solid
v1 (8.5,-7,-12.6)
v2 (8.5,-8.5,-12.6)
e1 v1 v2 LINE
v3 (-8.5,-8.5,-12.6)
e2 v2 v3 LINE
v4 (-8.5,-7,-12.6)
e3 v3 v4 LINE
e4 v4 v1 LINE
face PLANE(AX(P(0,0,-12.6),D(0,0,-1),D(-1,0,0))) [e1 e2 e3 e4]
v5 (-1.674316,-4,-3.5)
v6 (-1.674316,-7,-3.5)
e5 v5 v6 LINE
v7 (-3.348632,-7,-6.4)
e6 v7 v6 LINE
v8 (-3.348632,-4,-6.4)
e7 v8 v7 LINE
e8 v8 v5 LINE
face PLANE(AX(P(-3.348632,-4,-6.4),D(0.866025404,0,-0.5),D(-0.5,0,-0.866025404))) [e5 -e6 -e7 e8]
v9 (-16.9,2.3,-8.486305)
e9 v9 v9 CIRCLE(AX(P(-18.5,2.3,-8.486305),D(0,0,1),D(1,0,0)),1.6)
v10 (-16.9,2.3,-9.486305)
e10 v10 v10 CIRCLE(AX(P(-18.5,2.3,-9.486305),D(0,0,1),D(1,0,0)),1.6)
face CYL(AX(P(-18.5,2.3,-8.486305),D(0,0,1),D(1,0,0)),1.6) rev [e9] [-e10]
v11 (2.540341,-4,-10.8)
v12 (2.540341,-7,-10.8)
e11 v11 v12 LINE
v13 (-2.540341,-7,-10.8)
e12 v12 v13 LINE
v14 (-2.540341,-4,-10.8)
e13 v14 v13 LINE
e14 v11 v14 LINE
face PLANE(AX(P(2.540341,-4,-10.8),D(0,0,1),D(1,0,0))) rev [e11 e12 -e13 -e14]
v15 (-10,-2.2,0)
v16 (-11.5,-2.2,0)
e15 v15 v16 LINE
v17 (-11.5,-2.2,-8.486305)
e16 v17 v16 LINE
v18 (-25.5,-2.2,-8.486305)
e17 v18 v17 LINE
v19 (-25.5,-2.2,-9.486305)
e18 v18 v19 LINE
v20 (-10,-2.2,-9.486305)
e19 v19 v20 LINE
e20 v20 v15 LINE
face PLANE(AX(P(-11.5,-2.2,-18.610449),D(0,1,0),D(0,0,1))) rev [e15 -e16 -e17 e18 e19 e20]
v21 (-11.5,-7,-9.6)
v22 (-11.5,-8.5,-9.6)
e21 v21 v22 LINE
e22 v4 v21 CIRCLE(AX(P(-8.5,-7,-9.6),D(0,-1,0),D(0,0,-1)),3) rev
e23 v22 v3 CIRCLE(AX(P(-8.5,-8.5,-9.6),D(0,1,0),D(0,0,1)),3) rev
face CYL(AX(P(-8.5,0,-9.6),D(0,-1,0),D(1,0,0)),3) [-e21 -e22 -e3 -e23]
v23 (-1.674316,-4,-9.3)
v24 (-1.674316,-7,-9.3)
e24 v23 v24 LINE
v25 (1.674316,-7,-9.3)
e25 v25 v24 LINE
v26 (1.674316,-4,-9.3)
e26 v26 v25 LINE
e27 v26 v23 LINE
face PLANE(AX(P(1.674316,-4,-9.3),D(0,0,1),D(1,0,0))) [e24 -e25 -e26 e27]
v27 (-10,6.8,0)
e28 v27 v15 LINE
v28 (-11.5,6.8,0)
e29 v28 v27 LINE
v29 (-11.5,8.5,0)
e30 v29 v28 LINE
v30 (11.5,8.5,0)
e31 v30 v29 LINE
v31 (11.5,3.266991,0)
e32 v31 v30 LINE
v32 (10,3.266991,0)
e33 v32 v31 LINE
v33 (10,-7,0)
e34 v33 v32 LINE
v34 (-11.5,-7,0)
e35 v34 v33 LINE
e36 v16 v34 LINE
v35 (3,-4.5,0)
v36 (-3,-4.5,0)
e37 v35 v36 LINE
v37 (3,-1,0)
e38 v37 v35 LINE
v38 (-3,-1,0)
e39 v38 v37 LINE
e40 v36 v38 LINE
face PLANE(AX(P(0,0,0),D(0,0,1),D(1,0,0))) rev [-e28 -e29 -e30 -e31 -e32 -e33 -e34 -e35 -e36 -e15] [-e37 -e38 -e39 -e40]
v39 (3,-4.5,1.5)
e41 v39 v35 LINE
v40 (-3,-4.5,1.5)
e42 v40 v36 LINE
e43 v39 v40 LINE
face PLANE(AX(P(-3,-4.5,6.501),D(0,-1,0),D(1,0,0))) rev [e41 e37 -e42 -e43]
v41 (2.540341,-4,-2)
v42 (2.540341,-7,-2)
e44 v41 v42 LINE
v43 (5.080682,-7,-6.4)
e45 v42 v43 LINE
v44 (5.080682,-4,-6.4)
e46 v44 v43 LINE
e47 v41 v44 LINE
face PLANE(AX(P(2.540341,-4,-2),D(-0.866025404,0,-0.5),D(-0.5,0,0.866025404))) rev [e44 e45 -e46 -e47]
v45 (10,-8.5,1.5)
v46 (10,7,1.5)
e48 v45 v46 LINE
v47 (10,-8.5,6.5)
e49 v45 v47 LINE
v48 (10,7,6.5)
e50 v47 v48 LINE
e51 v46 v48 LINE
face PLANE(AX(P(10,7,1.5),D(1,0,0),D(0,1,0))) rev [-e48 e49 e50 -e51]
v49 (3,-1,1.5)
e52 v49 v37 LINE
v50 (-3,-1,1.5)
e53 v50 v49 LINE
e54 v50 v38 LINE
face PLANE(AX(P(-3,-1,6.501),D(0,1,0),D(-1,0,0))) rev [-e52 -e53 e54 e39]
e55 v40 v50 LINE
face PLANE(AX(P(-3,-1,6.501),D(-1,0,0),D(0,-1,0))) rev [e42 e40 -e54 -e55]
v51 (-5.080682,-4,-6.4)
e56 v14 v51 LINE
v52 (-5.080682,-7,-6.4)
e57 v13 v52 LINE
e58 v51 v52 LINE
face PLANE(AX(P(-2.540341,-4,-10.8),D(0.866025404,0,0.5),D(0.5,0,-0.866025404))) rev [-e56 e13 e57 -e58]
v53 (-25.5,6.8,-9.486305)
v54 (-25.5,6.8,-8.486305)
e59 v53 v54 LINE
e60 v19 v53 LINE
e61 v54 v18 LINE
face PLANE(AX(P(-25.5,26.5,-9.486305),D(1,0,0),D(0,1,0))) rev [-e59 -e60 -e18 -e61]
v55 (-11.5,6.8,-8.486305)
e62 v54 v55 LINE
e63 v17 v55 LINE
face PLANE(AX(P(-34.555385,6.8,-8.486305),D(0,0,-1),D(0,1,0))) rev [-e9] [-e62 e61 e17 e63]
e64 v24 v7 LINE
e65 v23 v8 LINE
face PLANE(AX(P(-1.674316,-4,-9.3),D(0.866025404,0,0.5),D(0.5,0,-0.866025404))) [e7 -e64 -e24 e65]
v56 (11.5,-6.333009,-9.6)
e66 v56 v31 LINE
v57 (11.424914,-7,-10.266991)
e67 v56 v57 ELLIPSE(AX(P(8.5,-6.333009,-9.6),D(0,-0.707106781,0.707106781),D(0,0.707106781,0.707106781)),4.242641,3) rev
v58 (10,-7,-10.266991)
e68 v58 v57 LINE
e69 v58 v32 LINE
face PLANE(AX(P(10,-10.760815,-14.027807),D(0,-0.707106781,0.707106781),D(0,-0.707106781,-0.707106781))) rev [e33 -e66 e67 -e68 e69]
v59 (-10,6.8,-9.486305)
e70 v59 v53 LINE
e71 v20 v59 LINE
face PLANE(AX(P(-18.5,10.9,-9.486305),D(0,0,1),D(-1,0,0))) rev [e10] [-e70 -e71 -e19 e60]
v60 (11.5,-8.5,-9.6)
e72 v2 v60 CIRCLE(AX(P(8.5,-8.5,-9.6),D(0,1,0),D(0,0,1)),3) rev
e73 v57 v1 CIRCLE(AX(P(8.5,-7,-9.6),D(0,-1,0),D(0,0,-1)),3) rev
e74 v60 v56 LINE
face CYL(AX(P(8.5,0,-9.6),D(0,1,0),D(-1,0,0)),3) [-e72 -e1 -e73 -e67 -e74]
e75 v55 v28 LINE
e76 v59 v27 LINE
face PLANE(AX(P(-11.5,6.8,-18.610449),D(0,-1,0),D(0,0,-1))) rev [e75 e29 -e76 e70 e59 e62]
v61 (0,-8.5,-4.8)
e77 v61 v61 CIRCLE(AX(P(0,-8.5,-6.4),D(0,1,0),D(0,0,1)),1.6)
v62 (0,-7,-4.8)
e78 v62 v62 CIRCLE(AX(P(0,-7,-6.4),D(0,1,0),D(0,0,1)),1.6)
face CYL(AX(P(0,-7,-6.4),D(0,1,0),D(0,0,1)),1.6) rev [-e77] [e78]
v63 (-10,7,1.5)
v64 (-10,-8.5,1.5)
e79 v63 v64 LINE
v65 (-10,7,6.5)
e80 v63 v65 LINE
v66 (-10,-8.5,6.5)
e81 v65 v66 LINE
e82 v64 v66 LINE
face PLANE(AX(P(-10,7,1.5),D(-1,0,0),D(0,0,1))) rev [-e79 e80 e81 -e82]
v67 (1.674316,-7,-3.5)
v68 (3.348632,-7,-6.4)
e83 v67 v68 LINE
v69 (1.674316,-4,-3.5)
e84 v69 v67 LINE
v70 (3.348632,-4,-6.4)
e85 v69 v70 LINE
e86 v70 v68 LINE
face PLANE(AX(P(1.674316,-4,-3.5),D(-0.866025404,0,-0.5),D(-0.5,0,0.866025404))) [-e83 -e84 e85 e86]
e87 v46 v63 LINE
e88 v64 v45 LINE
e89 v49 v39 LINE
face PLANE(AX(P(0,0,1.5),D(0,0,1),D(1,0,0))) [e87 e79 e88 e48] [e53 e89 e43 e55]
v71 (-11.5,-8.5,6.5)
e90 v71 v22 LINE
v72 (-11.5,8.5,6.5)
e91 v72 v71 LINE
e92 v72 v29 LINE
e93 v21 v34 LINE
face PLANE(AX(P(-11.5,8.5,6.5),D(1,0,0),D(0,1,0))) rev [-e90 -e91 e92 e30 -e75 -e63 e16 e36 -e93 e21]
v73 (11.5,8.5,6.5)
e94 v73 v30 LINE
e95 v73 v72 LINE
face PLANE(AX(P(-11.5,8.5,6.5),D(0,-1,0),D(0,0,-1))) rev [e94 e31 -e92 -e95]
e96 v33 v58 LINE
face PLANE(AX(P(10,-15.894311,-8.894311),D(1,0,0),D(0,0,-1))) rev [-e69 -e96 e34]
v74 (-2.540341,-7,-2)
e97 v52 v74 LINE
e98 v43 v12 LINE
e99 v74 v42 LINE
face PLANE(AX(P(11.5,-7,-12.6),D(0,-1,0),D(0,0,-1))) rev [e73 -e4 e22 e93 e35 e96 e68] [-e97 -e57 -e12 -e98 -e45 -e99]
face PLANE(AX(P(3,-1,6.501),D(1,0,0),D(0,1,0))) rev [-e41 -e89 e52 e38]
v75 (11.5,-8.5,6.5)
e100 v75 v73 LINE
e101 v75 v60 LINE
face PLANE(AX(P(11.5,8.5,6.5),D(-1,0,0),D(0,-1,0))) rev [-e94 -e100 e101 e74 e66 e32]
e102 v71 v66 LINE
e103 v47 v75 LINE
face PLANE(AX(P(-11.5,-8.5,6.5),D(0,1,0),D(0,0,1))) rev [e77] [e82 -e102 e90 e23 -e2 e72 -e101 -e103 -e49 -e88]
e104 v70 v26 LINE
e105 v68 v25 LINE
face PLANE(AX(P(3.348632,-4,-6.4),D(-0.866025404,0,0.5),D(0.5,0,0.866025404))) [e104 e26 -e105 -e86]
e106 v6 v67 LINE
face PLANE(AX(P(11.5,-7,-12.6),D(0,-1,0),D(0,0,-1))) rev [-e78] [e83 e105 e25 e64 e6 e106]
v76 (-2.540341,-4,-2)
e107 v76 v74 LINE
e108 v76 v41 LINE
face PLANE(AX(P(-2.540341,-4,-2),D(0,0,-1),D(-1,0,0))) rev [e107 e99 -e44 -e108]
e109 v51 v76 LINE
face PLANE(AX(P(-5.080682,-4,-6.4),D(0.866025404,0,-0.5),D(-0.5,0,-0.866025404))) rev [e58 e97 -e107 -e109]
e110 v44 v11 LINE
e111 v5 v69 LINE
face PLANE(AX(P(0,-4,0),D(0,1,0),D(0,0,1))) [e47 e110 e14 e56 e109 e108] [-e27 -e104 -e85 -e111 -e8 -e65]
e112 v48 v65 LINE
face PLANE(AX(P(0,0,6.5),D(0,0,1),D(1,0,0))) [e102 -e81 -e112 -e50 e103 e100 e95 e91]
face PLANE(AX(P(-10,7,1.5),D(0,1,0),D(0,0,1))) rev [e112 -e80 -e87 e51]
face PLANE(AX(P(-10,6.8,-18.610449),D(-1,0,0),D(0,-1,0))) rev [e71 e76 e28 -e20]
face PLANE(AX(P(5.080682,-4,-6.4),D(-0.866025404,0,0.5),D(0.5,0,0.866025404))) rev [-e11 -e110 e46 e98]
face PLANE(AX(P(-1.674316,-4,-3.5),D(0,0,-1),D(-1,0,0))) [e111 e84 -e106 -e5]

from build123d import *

# Parameters (mm, degrees)
SKETCH_1_W          = 23
SKETCH_1_H          = 17
EXTRUDE_1_DEPTH     = 6.5
SKETCH_2_W          = 20
SKETCH_2_H          = 15.5
CUT_EXTRUDE_1_DEPTH = 5
SKETCH_3_W          = 23
SKETCH_3_H          = 1.5
EXTRUDE_2_DEPTH     = 12.6
EXTRUDE_3_DEPTH     = 3
HOLE_WIZARD_M3_1_D  = 3.2
EXTRUDE_START       = 10
EXTRUDE_6_DEPTH     = 1.5
FILLET_1_R          = 3
SKETCH_10_W         = 1.5
SKETCH_10_H         = 9
EXTRUDE_7_DEPTH     = 9.486304789
SKETCH_11_W         = 1
SKETCH_11_H         = 9
EXTRUDE_8_DEPTH     = 14
HOLE_WIZARD_M3_2_D  = 3.2
CUT_EXTRUDE_2_REACH = 31.686
SKETCH_14_W         = 6
SKETCH_14_H         = 3.5


# Read off the part's stored shape, not the designer's step: 凸台-拉伸6
with BuildPart() as part:
    # 草图1 → 凸台-拉伸1 (new body)
    with BuildSketch(Plane.XY):
        Rectangle(SKETCH_1_W, SKETCH_1_H)
    extrude(amount=EXTRUDE_1_DEPTH)

    # 草图2 → 切除-拉伸1 (cut)
    with BuildSketch(Plane.XY.offset(6.5)):
        with Locations((0, -0.75)):
            Rectangle(SKETCH_2_W, SKETCH_2_H)
    extrude(amount=-CUT_EXTRUDE_1_DEPTH, mode=Mode.SUBTRACT)

    # 草图3 → 凸台-拉伸2 (add)
    with BuildSketch(Plane(origin=(0, 0, 0), x_dir=(-1, 0, 0), z_dir=(0, 0, -1))):
        with Locations((0, -7.75)):
            Rectangle(SKETCH_3_W, SKETCH_3_H)
    extrude(amount=EXTRUDE_2_DEPTH)

    # 草图4 → 凸台-拉伸3 (add)
    with BuildSketch(Plane(origin=(0, -7, 0), x_dir=(1, 0, 0), z_dir=(0, 1, 0))):
        Polygon((5.080682369, 6.4), (2.540341184, 10.8), (-2.540341184, 10.8), (-5.080682369, 6.4), (-2.540341184, 2), (2.540341184, 2), align=None)
        Polygon((3.348631561, 6.4), (1.674315781, 9.3), (-1.674315781, 9.3), (-3.348631561, 6.4), (-1.674315781, 3.5), (1.674315781, 3.5), align=None, mode=Mode.SUBTRACT)
    extrude(amount=EXTRUDE_3_DEPTH)

    # M3 间隙孔1 (through all)
    with Locations(Plane(origin=(0, -7, 0), x_dir=(1, 0, 0), z_dir=(0, 1, 0))):
        with Locations((0, 6.4)):
            Hole(HOLE_WIZARD_M3_1_D / 2)

    # 凸台-拉伸6 outline → 凸台-拉伸6 (add)
    with BuildSketch(Plane.YZ.offset(EXTRUDE_START)):
        Polygon((-7, -10.266991259), (3.266991259, 0), (-7, 0), align=None)
    extrude(amount=EXTRUDE_6_DEPTH)

    # 圆角1
    fillet_1_edges = [part.edges().sort_by_distance(p)[0] for p in [
        (-11.5, -7.75, -12.6),
        (11.5, -7.75, -12.6),
    ]]
    fillet(fillet_1_edges, radius=FILLET_1_R)

    # 草图10 → 凸台-拉伸7 (add)
    with BuildSketch(Plane(origin=(0, 0, 0), x_dir=(-1, 0, 0), z_dir=(0, 0, -1))):
        with Locations((10.75, 2.3)):
            Rectangle(SKETCH_10_W, SKETCH_10_H)
    extrude(amount=EXTRUDE_7_DEPTH)

    # 草图11 → 凸台-拉伸8 (add)
    with BuildSketch(Plane.ZY.offset(11.5)):
        with Locations((-8.986304789, 2.3)):
            Rectangle(SKETCH_11_W, SKETCH_11_H)
    extrude(amount=EXTRUDE_8_DEPTH)

    # M3 间隙孔2 (through all)
    with Locations(Plane.XY.offset(-8.486304789)):
        with Locations((-18.5, 2.3)):
            Hole(HOLE_WIZARD_M3_2_D / 2)

    # 草图14 → 切除-拉伸2 (cut, up to next)
    with BuildSketch(Plane(origin=(0, 0, 0), x_dir=(-1, 0, 0), z_dir=(0, 0, -1)), mode=Mode.PRIVATE) as cut_extrude_2_sk1:
        with Locations((0, -2.75)):
            Rectangle(SKETCH_14_W, SKETCH_14_H)
    cut_extrude_2_tool1 = extrude(cut_extrude_2_sk1.sketch, amount=-CUT_EXTRUDE_2_REACH, mode=Mode.PRIVATE) & part.part
    add(cut_extrude_2_tool1.solids().sort_by_distance((0, -2.75, 0))[0], mode=Mode.SUBTRACT)


solid = part.part
